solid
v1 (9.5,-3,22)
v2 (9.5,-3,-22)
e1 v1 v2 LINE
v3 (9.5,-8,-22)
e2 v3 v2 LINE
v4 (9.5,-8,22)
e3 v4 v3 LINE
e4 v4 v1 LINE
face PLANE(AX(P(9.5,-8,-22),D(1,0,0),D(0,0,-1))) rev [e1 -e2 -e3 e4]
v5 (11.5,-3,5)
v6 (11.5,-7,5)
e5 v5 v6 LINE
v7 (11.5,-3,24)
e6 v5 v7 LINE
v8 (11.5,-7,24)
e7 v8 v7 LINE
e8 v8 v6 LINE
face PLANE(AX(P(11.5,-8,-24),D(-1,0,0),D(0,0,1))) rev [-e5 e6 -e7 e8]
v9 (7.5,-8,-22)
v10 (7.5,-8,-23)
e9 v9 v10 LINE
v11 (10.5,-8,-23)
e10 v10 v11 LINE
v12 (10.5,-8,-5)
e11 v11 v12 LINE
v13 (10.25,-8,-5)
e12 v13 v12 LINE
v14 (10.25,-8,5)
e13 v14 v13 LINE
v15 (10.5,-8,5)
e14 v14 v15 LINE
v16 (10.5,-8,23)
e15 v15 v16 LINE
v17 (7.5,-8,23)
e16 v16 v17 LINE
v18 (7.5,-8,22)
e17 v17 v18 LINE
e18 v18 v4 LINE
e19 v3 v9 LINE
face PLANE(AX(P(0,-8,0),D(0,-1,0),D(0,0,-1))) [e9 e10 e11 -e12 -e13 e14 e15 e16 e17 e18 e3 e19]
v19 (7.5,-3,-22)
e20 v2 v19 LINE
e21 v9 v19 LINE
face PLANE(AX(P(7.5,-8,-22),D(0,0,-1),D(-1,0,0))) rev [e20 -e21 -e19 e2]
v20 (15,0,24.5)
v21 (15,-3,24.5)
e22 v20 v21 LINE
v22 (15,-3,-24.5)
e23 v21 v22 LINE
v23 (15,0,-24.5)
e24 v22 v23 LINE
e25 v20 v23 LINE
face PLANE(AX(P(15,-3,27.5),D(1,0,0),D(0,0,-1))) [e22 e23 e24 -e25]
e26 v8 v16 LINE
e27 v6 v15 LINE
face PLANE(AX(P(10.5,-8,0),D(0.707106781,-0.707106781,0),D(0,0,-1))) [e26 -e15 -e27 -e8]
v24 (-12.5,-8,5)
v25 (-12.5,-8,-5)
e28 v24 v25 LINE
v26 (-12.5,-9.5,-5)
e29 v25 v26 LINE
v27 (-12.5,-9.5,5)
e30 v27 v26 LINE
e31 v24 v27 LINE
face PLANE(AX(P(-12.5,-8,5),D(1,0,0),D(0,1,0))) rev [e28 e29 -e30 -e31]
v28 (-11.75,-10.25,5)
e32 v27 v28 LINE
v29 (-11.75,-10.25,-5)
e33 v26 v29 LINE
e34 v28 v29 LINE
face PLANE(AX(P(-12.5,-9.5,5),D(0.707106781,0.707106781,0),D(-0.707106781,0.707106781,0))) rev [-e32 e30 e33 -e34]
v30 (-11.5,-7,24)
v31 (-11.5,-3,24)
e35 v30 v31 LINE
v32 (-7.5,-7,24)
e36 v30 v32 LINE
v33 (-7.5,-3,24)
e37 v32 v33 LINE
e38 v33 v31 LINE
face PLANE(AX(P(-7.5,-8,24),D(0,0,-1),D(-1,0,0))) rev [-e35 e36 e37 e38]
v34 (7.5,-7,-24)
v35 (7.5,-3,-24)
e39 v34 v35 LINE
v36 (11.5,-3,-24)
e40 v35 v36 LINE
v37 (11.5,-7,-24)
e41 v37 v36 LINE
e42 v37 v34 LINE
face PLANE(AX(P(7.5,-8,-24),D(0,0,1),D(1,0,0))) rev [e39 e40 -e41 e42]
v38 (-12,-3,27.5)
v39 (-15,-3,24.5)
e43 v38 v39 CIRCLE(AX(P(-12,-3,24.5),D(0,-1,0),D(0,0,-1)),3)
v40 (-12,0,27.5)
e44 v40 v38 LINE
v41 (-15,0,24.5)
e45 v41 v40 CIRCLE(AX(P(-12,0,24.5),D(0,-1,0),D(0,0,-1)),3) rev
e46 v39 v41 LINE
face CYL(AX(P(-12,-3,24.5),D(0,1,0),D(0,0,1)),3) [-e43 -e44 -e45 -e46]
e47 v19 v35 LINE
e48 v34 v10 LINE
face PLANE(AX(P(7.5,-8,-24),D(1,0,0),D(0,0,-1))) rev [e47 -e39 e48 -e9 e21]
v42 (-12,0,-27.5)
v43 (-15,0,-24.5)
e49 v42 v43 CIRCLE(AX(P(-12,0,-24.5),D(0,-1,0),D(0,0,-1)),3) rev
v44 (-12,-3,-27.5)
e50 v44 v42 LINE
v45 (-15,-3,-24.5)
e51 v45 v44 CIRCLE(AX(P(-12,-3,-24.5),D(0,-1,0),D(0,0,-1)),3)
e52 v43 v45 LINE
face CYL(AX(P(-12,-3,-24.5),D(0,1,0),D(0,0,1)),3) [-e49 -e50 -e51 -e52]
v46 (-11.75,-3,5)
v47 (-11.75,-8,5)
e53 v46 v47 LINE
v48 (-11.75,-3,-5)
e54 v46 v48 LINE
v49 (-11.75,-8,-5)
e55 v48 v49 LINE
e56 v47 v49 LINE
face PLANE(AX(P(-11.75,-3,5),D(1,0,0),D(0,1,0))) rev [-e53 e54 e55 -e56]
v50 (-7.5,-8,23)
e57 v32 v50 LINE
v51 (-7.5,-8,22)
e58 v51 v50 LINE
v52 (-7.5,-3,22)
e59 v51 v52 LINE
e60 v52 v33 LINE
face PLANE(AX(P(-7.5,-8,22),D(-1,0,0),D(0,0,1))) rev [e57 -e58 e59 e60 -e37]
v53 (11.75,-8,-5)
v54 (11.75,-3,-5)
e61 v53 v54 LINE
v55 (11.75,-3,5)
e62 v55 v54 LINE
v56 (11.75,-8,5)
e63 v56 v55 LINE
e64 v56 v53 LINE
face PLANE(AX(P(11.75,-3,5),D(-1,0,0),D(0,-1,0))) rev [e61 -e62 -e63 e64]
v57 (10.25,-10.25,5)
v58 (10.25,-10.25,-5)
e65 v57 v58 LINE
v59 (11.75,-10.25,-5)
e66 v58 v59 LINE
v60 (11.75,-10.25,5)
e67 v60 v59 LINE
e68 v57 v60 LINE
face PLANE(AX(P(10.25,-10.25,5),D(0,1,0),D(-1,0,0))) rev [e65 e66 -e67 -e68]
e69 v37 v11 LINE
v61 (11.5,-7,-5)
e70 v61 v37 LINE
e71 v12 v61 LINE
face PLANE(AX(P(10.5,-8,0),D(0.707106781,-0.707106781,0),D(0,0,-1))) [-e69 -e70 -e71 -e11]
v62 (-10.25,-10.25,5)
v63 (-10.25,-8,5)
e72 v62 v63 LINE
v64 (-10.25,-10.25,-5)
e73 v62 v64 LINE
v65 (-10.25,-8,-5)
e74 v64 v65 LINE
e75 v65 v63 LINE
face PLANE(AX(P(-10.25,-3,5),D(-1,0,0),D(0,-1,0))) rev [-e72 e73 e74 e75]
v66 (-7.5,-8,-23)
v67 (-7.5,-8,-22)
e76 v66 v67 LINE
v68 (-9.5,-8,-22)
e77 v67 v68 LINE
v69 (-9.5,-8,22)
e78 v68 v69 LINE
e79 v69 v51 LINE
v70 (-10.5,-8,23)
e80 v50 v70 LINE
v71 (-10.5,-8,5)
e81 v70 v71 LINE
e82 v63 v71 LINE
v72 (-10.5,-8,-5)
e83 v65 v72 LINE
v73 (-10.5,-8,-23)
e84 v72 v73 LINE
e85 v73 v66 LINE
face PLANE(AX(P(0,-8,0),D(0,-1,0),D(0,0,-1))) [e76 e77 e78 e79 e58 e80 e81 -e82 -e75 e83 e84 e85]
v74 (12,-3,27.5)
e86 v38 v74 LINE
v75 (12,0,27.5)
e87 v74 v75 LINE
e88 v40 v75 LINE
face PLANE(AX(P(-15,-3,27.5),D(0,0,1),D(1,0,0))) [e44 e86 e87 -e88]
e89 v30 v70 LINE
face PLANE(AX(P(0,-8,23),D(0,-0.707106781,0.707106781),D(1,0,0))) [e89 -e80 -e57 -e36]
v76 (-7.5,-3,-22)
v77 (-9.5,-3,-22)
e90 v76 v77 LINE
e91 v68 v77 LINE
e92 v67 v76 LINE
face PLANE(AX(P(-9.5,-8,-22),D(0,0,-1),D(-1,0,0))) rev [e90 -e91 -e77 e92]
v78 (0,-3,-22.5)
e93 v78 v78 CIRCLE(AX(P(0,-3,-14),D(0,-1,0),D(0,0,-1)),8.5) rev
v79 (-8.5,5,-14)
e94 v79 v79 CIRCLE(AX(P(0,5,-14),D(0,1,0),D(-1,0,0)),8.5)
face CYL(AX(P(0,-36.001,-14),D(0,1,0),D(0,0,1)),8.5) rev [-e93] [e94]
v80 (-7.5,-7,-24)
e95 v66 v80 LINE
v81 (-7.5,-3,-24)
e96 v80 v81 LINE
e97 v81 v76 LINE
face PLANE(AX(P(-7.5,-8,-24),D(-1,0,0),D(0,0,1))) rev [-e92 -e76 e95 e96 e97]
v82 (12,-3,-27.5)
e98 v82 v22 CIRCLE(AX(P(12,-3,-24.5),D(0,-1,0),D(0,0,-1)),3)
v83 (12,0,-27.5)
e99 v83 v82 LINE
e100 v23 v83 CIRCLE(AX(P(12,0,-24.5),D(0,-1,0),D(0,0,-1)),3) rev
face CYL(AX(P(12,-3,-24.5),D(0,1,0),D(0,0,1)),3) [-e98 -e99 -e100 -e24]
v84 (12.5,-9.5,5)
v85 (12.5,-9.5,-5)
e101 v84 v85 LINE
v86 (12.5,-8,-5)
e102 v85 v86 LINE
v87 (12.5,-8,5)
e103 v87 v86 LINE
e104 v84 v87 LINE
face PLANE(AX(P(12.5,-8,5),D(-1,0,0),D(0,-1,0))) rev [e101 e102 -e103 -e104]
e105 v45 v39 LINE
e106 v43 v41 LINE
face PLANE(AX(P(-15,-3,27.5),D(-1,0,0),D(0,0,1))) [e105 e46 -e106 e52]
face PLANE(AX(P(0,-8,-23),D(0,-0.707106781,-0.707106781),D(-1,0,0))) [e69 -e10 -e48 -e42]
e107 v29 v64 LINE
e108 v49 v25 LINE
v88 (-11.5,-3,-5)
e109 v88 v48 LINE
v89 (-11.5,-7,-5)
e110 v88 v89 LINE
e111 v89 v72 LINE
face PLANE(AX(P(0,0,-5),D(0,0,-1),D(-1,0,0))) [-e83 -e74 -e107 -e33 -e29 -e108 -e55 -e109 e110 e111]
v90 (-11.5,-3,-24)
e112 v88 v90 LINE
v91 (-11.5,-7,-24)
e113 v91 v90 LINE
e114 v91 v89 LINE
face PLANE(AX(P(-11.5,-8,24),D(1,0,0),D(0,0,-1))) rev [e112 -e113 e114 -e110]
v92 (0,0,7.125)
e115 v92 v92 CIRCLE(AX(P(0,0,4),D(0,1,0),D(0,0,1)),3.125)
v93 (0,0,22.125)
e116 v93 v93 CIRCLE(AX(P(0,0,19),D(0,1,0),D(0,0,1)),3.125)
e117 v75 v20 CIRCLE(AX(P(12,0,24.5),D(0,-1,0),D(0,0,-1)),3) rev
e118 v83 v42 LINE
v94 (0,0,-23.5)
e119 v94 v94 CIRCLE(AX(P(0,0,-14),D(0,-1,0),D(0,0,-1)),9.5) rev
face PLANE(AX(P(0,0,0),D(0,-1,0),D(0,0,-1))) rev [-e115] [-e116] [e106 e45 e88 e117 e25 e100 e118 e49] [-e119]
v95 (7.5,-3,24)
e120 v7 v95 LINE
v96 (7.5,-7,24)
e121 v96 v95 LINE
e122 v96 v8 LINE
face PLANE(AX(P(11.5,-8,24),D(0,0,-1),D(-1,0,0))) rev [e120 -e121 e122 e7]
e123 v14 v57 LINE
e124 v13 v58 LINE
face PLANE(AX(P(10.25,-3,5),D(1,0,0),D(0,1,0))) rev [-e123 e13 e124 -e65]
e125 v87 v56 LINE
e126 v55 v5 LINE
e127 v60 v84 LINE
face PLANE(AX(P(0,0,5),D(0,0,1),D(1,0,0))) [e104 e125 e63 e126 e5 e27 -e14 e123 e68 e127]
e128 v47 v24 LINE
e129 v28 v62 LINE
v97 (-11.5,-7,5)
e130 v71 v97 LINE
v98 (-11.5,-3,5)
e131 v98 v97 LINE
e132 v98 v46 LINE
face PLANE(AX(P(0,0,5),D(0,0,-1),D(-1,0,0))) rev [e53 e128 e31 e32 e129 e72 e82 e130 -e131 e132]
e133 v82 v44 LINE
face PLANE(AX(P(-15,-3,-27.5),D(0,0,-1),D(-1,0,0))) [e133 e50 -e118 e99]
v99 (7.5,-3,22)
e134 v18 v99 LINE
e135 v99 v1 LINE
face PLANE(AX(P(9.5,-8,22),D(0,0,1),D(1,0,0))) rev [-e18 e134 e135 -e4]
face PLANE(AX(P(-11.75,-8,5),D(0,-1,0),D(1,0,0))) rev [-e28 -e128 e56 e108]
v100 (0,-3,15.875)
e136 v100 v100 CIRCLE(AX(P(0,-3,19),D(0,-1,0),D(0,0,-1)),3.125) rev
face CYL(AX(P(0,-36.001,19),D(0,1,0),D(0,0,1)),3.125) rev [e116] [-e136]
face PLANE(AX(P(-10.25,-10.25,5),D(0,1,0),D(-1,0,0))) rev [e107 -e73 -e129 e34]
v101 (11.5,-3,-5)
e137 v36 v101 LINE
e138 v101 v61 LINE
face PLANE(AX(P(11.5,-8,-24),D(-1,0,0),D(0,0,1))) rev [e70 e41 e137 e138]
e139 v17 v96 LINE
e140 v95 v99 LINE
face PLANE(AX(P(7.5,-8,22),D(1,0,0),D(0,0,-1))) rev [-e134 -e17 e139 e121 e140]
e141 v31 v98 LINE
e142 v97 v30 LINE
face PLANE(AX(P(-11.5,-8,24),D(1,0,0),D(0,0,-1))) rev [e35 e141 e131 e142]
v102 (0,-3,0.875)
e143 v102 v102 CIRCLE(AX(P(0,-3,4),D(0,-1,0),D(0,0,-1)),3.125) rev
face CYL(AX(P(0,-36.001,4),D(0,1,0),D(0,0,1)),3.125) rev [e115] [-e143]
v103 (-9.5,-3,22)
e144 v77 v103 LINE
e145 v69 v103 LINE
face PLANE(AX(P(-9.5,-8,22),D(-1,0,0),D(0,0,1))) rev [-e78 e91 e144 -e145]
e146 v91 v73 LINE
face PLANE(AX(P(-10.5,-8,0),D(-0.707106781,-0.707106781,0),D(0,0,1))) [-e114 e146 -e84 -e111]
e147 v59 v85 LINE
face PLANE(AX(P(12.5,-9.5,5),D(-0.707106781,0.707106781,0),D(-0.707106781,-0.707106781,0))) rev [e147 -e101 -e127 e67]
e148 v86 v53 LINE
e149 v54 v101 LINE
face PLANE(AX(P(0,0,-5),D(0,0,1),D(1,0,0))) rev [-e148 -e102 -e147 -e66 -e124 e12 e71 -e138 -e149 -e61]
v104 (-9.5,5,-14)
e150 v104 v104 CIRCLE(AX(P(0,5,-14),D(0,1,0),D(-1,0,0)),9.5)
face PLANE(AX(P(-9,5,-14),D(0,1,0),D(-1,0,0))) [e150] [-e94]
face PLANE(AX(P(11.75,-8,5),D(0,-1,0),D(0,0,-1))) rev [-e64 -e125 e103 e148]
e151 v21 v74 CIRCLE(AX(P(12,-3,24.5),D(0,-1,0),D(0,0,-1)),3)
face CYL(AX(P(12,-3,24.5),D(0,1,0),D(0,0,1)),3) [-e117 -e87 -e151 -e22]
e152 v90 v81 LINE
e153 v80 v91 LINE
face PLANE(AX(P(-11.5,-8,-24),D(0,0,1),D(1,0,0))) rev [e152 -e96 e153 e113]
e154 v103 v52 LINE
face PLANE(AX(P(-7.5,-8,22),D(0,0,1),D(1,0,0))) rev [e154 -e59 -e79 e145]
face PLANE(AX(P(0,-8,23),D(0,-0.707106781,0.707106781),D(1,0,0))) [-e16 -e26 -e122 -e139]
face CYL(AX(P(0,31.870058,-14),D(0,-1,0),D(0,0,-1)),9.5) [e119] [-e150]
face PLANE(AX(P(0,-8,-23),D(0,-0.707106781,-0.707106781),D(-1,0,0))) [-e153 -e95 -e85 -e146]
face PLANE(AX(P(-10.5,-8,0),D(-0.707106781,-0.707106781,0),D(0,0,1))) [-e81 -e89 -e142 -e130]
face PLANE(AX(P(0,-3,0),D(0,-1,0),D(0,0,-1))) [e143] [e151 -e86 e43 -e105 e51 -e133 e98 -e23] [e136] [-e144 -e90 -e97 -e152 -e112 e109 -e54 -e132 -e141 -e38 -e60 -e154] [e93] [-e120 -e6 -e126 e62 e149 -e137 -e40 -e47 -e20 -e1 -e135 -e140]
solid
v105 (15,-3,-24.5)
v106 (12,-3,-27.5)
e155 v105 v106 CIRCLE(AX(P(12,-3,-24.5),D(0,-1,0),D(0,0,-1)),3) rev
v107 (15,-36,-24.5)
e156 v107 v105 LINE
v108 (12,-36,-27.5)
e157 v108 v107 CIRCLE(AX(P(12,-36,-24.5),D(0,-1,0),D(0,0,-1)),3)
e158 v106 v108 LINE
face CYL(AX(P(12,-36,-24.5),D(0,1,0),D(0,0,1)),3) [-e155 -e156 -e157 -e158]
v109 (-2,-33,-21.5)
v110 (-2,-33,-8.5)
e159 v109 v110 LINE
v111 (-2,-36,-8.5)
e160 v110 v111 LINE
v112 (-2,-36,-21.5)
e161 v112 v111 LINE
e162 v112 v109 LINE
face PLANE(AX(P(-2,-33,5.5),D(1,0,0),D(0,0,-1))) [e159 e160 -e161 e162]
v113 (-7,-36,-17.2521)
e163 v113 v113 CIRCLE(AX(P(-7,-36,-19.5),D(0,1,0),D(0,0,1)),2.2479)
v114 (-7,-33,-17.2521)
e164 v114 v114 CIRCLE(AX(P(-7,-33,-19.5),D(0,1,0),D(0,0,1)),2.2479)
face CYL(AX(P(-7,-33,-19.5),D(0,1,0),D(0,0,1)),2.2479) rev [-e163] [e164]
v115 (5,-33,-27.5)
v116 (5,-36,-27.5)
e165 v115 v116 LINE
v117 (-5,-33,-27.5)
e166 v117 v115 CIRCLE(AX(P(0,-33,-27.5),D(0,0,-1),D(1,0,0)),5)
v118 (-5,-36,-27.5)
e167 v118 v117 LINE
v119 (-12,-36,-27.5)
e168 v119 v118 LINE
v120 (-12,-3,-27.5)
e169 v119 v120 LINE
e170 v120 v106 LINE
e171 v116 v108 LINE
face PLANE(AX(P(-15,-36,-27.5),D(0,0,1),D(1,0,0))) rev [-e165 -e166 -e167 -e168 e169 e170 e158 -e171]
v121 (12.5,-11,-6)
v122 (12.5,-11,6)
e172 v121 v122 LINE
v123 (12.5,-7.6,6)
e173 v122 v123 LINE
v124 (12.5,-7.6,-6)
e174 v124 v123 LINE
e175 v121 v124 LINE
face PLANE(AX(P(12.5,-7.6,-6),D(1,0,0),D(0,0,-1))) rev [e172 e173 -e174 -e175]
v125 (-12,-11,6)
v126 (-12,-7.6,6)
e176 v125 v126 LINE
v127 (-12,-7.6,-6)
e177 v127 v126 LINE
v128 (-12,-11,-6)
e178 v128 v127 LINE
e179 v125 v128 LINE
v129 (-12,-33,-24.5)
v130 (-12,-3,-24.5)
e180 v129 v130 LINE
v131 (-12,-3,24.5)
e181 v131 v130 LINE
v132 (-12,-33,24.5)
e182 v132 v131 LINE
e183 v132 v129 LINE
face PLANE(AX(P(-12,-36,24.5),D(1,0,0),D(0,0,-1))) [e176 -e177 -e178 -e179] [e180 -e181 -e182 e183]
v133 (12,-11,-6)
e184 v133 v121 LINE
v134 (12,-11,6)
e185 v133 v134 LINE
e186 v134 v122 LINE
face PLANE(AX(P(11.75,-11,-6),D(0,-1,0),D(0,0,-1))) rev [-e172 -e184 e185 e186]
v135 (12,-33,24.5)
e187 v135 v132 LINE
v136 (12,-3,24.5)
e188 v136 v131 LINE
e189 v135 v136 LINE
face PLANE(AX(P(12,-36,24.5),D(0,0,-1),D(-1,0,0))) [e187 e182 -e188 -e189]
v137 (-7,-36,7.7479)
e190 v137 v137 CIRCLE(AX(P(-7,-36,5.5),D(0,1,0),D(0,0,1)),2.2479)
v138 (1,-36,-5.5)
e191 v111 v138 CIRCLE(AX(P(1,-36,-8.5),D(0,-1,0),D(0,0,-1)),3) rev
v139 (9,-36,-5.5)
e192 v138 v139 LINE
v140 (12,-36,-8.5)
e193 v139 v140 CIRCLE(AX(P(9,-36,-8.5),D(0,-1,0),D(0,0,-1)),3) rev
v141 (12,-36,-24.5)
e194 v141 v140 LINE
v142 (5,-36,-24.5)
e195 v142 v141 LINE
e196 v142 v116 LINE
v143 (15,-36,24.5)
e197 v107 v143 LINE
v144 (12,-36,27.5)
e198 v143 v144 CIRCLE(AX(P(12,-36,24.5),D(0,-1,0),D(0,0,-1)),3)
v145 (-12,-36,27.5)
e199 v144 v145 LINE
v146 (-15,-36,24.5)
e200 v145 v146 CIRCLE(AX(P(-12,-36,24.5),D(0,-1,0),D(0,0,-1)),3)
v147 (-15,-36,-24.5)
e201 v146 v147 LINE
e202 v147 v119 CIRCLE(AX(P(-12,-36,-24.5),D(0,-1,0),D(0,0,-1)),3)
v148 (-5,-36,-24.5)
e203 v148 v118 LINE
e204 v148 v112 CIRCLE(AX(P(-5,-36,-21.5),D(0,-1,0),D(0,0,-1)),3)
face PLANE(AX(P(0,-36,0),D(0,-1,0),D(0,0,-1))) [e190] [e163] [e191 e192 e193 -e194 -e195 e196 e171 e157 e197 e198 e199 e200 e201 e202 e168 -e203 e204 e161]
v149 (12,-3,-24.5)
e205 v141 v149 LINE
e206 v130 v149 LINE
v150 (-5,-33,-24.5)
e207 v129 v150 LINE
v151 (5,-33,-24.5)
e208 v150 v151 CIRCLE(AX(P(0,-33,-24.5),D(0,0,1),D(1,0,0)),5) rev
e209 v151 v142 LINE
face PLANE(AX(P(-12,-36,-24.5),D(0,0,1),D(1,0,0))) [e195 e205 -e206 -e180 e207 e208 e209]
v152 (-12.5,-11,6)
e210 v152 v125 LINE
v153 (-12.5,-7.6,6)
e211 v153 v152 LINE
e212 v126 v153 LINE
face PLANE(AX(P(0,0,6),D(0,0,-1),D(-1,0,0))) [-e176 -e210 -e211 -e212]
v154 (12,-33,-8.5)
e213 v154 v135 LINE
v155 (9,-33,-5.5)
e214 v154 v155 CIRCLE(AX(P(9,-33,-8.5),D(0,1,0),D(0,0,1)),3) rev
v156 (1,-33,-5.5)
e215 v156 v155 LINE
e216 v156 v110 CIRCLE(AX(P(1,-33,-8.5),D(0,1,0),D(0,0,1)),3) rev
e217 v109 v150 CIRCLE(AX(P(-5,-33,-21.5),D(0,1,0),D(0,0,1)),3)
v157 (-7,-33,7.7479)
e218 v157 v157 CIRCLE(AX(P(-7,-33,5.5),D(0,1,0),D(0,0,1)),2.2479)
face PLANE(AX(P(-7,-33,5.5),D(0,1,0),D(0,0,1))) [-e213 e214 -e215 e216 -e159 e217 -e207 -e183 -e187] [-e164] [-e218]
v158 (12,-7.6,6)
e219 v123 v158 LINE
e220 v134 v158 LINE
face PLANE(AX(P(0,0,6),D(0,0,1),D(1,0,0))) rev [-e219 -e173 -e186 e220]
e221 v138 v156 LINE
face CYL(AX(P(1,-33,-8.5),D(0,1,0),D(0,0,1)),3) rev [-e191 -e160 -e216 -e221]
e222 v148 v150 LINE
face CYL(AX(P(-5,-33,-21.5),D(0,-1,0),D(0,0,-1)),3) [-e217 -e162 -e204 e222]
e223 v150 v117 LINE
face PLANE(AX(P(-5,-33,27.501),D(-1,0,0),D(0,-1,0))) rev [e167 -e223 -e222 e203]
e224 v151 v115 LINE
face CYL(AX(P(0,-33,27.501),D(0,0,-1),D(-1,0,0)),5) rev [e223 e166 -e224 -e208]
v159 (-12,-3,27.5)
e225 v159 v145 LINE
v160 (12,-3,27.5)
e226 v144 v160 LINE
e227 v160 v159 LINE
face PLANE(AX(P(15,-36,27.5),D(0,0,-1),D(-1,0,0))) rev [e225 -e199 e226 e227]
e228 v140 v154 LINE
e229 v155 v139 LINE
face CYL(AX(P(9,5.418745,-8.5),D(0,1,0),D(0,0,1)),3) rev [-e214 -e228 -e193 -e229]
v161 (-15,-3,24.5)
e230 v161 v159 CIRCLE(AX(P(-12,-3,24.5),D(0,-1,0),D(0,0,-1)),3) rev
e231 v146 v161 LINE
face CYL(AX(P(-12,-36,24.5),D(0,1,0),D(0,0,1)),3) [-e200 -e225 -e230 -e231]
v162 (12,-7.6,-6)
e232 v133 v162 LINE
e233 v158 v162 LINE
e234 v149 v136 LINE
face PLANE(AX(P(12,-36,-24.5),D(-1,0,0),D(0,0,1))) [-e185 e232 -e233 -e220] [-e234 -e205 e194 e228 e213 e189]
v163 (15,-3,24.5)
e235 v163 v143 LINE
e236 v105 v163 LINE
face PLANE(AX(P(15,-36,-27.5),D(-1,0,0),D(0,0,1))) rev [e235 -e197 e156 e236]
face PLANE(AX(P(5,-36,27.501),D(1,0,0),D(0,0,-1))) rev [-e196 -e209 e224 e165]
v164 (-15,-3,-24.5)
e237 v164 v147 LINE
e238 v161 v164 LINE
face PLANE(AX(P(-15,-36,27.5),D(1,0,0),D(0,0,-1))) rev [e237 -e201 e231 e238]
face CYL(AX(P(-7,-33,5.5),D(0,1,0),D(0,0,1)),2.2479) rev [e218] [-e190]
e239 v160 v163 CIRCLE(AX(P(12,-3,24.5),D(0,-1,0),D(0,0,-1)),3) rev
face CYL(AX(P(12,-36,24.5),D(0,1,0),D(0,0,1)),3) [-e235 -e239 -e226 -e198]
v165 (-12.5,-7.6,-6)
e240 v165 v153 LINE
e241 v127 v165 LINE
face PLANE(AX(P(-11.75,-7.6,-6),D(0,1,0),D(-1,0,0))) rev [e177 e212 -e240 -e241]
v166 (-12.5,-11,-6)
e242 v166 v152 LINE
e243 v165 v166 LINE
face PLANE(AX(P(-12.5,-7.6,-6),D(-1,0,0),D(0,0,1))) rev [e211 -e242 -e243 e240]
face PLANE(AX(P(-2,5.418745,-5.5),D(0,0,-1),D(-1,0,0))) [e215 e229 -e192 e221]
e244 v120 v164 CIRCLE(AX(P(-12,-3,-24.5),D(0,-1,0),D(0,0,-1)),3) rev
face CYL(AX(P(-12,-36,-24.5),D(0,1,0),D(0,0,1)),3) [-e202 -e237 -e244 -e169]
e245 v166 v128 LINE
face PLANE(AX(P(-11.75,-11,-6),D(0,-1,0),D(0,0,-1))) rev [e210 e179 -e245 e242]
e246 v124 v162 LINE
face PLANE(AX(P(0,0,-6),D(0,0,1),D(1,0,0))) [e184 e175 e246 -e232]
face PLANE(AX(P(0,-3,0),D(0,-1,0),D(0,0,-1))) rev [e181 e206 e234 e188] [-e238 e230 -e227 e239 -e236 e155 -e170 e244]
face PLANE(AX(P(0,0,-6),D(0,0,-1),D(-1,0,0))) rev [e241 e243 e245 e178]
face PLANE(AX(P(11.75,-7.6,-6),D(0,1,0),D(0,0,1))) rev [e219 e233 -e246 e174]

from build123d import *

# Parameters (mm, degrees)
SKETCH1_W                      = 30
SKETCH1_H                      = 55
BOSS_EXTRUDE7_DEPTH            = 3
SKETCH14_W                     = 30
SKETCH14_H                     = 55
SKETCH14_W_2                   = 24
SKETCH14_H_2                   = 49
BOSS_EXTRUDE8_DEPTH            = 33
CUT_EXTRUDE1_DEPTH             = 3
BOSS_EXTRUDE12_DEPTH           = 3
SKETCH31_W                     = 2.2479
SKETCH31_H                     = 3
F_8_CLEARANCE_HOLE3_AT_2_COUNT = 2
F_8_CLEARANCE_HOLE3_AT_2_PITCH = 25
FILLET1_R                      = 3
FILLET2_R                      = 3
FILLET3_R                      = 3
BOSS_EXTRUDE13_DEPTH           = 5
SKETCH36_W                     = 0.75
SKETCH36_H                     = 3.4
CUT_EXTRUDE2_DEPTH             = 6
SKETCH37_R                     = 3.125
SKETCH37_R_2                   = 8.5
CUT_EXTRUDE3_DEPTH             = 3
BOSS_EXTRUDE14_START           = 5
SKETCH38_R                     = 9.5
SKETCH38_R_2                   = 8.5
BOSS_EXTRUDE14_DEPTH           = 5
BOSS_EXTRUDE15_DEPTH           = 5
CHAMFER1_SIZE                  = 1
BOSS_EXTRUDE16_DEPTH           = 3
FILLET4_R                      = 3


with BuildPart() as part:
    # Sketch1 → Boss-Extrude7 (new body)
    with BuildSketch(Plane(origin=(0, 0, 0), x_dir=(1, 0, 0), z_dir=(0, 1, 0))):
        Rectangle(SKETCH1_W, SKETCH1_H)
    extrude(amount=-BOSS_EXTRUDE7_DEPTH)

    # Fillet3
    fillet3_edges = [part.edges().sort_by_distance(p)[0] for p in [
        (15, -1.5, 27.5),
        (-15, -1.5, 27.5),
        (-15, -1.5, -27.5),
        (15, -1.5, -27.5),
    ]]
    fillet(fillet3_edges, radius=FILLET3_R)

    # Sketch35 → Boss-Extrude13 (add, symmetric)
    with BuildSketch(Plane.XY):
        Polygon((10.25, -3), (11.75, -3), (11.75, -8), (12.5, -8), (12.5, -9.5), (11.75, -10.25), (10.25, -10.25), align=None)
        Polygon((-12.5, -9.5), (-11.75, -10.25), (-10.25, -10.25), (-10.25, -3), (-11.75, -3), (-11.75, -8), (-12.5, -8), align=None)
    extrude(amount=BOSS_EXTRUDE13_DEPTH, both=True)

    # Sketch37 → Cut-Extrude3 (cut)
    with BuildSketch(Plane(origin=(0, 0, 0), x_dir=(1, 0, 0), z_dir=(0, 1, 0))):
        with Locations(Location((0, -4, 0), (0, 0, 270))):
            Circle(SKETCH37_R)
        with Locations(Location((0, -19, 0), (0, 0, 270))):
            Circle(SKETCH37_R)
        with Locations(Location((0, 14, 0), (0, 0, 270))):
            Circle(SKETCH37_R_2)
    extrude(amount=-CUT_EXTRUDE3_DEPTH, mode=Mode.SUBTRACT)

    # Sketch38 → Boss-Extrude14 (add)
    with BuildSketch(Plane(origin=(0, 0, 0), x_dir=(1, 0, 0), z_dir=(0, 1, 0)).offset(BOSS_EXTRUDE14_START)):
        with Locations(Location((0, 14, 0), (0, 0, 90))):
            Circle(SKETCH38_R)
        with Locations(Location((0, 14, 0), (0, 0, 180))):
            Circle(SKETCH38_R_2, mode=Mode.SUBTRACT)
    extrude(amount=-BOSS_EXTRUDE14_DEPTH)

    # Sketch39 → Boss-Extrude15 (add)
    with BuildSketch(Plane.XZ.offset(3)):
        Polygon((11.5, 24), (7.5, 24), (7.5, 22), (9.5, 22), (9.5, -22), (7.5, -22), (7.5, -24), (11.5, -24), align=None)
        Polygon((-11.5, 24), (-11.5, -24), (-7.5, -24), (-7.5, -22), (-9.5, -22), (-9.5, 22), (-7.5, 22), (-7.5, 24), align=None)
    extrude(amount=BOSS_EXTRUDE15_DEPTH)

    # Chamfer1
    chamfer1_edges = [part.edges().sort_by_distance(p)[0] for p in [
        (11.5, -8, 14.5),
        (9.5, -8, 24),
        (9.5, -8, -24),
        (11.5, -8, -14.5),
        (-11.5, -8, -14.5),
        (-9.5, -8, -24),
        (-9.5, -8, 24),
        (-11.5, -8, 14.5),
    ]]
    chamfer(chamfer1_edges, length=CHAMFER1_SIZE)


with BuildPart() as body_2:
    # Sketch14 → Boss-Extrude8 (new body)
    with BuildSketch(Plane.XZ.offset(3)):
        Rectangle(SKETCH14_W, SKETCH14_H)
        Rectangle(SKETCH14_W_2, SKETCH14_H_2, mode=Mode.SUBTRACT)
    extrude(amount=BOSS_EXTRUDE8_DEPTH)

    # Sketch17 → Cut-Extrude1 (cut)
    with BuildSketch(Plane(origin=(-12.5, 0, -27.5), x_dir=(-1, 0, 0), z_dir=(0, 0, -1))):
        with BuildLine():
            Line((-17.5, -36), (-17.5, -33))
            ThreePointArc((-17.5, -33), (-12.5, -28), (-7.5, -33))
            Line((-7.5, -33), (-7.5, -36))
            Line((-7.5, -36), (-17.5, -36))
        make_face()
    extrude(amount=-CUT_EXTRUDE1_DEPTH, mode=Mode.SUBTRACT)

    # Sketch29 → Boss-Extrude12 (add)
    with BuildSketch(Plane.XZ.offset(36)):
        with BuildLine():
            Line((-12, 10.5), (-7, 10.5))
            ThreePointArc((-7, 10.5), (-3.464466094, 9.035533906), (-2, 5.5))
            Line((-2, 5.5), (-2, -24.5))
            Line((-2, -24.5), (-12, -24.5))
            Line((-12, -24.5), (-12, 10.5))
        make_face()
    extrude(amount=-BOSS_EXTRUDE12_DEPTH)

    # Sketch31 → #8 Clearance Hole3 (revolve, cut)
    with BuildSketch(Plane(origin=(-7, -33, 5.5), x_dir=(0, 0, 1), z_dir=(1, 0, 0))):
        with Locations((1.12395, 1.5)):
            Rectangle(SKETCH31_W, SKETCH31_H)
    f_8_clearance_hole3 = revolve(axis=Axis((-7, -26.65, 5.5), (0, -1, 0)), mode=Mode.SUBTRACT)

    # #8 Clearance Hole3 at 2: #8 Clearance Hole3 ×2
    with Locations(*[(0, 0, -i * F_8_CLEARANCE_HOLE3_AT_2_PITCH) for i in range(1, F_8_CLEARANCE_HOLE3_AT_2_COUNT)]):
        add(f_8_clearance_hole3, mode=Mode.SUBTRACT)

    # Fillet1
    fillet1_edges = [body_2.edges().sort_by_distance(p)[0] for p in [
        (-2, -34.5, -24.5),
    ]]
    fillet(fillet1_edges, radius=FILLET1_R - 0.0001)  # a hair under: the kernel refuses the full size

    # Fillet2
    fillet2_edges = [body_2.edges().sort_by_distance(p)[0] for p in [
        (-15, -19.5, -27.5),
        (-15, -19.5, 27.5),
        (15, -19.5, 27.5),
        (15, -19.5, -27.5),
    ]]
    fillet(fillet2_edges, radius=FILLET2_R)

    # Sketch36 → Cut-Extrude2 (cut, symmetric)
    with BuildSketch(Plane.XY):
        with Locations((12.125, -9.3)):
            Rectangle(SKETCH36_W, SKETCH36_H)
        with Locations((-12.125, -9.3)):
            Rectangle(SKETCH36_W, SKETCH36_H)
    extrude(amount=CUT_EXTRUDE2_DEPTH, both=True, mode=Mode.SUBTRACT)

    # Sketch41 → Boss-Extrude16 (add)
    with BuildSketch(Plane.XZ.offset(36)):
        with BuildLine():
            Line((-2, -5.5), (-2, 5.5))
            ThreePointArc((-2, 5.5), (-3.464466094, 9.035533906), (-7, 10.5))
            Line((-7, 10.5), (-12, 10.5))
            Line((-12, 10.5), (-12, 24.5))
            Line((-12, 24.5), (12, 24.5))
            Line((12, 24.5), (12, -5.5))
            Line((12, -5.5), (-2, -5.5))
        make_face()
    extrude(amount=-BOSS_EXTRUDE16_DEPTH)

    # Fillet4
    fillet4_edges = [body_2.edges().sort_by_distance(p)[0] for p in [
        (-2, -34.5, -5.5),
        (12, -34.5, -5.5),
    ]]
    fillet(fillet4_edges, radius=FILLET4_R)


solid = Compound([part.part, body_2.part])
